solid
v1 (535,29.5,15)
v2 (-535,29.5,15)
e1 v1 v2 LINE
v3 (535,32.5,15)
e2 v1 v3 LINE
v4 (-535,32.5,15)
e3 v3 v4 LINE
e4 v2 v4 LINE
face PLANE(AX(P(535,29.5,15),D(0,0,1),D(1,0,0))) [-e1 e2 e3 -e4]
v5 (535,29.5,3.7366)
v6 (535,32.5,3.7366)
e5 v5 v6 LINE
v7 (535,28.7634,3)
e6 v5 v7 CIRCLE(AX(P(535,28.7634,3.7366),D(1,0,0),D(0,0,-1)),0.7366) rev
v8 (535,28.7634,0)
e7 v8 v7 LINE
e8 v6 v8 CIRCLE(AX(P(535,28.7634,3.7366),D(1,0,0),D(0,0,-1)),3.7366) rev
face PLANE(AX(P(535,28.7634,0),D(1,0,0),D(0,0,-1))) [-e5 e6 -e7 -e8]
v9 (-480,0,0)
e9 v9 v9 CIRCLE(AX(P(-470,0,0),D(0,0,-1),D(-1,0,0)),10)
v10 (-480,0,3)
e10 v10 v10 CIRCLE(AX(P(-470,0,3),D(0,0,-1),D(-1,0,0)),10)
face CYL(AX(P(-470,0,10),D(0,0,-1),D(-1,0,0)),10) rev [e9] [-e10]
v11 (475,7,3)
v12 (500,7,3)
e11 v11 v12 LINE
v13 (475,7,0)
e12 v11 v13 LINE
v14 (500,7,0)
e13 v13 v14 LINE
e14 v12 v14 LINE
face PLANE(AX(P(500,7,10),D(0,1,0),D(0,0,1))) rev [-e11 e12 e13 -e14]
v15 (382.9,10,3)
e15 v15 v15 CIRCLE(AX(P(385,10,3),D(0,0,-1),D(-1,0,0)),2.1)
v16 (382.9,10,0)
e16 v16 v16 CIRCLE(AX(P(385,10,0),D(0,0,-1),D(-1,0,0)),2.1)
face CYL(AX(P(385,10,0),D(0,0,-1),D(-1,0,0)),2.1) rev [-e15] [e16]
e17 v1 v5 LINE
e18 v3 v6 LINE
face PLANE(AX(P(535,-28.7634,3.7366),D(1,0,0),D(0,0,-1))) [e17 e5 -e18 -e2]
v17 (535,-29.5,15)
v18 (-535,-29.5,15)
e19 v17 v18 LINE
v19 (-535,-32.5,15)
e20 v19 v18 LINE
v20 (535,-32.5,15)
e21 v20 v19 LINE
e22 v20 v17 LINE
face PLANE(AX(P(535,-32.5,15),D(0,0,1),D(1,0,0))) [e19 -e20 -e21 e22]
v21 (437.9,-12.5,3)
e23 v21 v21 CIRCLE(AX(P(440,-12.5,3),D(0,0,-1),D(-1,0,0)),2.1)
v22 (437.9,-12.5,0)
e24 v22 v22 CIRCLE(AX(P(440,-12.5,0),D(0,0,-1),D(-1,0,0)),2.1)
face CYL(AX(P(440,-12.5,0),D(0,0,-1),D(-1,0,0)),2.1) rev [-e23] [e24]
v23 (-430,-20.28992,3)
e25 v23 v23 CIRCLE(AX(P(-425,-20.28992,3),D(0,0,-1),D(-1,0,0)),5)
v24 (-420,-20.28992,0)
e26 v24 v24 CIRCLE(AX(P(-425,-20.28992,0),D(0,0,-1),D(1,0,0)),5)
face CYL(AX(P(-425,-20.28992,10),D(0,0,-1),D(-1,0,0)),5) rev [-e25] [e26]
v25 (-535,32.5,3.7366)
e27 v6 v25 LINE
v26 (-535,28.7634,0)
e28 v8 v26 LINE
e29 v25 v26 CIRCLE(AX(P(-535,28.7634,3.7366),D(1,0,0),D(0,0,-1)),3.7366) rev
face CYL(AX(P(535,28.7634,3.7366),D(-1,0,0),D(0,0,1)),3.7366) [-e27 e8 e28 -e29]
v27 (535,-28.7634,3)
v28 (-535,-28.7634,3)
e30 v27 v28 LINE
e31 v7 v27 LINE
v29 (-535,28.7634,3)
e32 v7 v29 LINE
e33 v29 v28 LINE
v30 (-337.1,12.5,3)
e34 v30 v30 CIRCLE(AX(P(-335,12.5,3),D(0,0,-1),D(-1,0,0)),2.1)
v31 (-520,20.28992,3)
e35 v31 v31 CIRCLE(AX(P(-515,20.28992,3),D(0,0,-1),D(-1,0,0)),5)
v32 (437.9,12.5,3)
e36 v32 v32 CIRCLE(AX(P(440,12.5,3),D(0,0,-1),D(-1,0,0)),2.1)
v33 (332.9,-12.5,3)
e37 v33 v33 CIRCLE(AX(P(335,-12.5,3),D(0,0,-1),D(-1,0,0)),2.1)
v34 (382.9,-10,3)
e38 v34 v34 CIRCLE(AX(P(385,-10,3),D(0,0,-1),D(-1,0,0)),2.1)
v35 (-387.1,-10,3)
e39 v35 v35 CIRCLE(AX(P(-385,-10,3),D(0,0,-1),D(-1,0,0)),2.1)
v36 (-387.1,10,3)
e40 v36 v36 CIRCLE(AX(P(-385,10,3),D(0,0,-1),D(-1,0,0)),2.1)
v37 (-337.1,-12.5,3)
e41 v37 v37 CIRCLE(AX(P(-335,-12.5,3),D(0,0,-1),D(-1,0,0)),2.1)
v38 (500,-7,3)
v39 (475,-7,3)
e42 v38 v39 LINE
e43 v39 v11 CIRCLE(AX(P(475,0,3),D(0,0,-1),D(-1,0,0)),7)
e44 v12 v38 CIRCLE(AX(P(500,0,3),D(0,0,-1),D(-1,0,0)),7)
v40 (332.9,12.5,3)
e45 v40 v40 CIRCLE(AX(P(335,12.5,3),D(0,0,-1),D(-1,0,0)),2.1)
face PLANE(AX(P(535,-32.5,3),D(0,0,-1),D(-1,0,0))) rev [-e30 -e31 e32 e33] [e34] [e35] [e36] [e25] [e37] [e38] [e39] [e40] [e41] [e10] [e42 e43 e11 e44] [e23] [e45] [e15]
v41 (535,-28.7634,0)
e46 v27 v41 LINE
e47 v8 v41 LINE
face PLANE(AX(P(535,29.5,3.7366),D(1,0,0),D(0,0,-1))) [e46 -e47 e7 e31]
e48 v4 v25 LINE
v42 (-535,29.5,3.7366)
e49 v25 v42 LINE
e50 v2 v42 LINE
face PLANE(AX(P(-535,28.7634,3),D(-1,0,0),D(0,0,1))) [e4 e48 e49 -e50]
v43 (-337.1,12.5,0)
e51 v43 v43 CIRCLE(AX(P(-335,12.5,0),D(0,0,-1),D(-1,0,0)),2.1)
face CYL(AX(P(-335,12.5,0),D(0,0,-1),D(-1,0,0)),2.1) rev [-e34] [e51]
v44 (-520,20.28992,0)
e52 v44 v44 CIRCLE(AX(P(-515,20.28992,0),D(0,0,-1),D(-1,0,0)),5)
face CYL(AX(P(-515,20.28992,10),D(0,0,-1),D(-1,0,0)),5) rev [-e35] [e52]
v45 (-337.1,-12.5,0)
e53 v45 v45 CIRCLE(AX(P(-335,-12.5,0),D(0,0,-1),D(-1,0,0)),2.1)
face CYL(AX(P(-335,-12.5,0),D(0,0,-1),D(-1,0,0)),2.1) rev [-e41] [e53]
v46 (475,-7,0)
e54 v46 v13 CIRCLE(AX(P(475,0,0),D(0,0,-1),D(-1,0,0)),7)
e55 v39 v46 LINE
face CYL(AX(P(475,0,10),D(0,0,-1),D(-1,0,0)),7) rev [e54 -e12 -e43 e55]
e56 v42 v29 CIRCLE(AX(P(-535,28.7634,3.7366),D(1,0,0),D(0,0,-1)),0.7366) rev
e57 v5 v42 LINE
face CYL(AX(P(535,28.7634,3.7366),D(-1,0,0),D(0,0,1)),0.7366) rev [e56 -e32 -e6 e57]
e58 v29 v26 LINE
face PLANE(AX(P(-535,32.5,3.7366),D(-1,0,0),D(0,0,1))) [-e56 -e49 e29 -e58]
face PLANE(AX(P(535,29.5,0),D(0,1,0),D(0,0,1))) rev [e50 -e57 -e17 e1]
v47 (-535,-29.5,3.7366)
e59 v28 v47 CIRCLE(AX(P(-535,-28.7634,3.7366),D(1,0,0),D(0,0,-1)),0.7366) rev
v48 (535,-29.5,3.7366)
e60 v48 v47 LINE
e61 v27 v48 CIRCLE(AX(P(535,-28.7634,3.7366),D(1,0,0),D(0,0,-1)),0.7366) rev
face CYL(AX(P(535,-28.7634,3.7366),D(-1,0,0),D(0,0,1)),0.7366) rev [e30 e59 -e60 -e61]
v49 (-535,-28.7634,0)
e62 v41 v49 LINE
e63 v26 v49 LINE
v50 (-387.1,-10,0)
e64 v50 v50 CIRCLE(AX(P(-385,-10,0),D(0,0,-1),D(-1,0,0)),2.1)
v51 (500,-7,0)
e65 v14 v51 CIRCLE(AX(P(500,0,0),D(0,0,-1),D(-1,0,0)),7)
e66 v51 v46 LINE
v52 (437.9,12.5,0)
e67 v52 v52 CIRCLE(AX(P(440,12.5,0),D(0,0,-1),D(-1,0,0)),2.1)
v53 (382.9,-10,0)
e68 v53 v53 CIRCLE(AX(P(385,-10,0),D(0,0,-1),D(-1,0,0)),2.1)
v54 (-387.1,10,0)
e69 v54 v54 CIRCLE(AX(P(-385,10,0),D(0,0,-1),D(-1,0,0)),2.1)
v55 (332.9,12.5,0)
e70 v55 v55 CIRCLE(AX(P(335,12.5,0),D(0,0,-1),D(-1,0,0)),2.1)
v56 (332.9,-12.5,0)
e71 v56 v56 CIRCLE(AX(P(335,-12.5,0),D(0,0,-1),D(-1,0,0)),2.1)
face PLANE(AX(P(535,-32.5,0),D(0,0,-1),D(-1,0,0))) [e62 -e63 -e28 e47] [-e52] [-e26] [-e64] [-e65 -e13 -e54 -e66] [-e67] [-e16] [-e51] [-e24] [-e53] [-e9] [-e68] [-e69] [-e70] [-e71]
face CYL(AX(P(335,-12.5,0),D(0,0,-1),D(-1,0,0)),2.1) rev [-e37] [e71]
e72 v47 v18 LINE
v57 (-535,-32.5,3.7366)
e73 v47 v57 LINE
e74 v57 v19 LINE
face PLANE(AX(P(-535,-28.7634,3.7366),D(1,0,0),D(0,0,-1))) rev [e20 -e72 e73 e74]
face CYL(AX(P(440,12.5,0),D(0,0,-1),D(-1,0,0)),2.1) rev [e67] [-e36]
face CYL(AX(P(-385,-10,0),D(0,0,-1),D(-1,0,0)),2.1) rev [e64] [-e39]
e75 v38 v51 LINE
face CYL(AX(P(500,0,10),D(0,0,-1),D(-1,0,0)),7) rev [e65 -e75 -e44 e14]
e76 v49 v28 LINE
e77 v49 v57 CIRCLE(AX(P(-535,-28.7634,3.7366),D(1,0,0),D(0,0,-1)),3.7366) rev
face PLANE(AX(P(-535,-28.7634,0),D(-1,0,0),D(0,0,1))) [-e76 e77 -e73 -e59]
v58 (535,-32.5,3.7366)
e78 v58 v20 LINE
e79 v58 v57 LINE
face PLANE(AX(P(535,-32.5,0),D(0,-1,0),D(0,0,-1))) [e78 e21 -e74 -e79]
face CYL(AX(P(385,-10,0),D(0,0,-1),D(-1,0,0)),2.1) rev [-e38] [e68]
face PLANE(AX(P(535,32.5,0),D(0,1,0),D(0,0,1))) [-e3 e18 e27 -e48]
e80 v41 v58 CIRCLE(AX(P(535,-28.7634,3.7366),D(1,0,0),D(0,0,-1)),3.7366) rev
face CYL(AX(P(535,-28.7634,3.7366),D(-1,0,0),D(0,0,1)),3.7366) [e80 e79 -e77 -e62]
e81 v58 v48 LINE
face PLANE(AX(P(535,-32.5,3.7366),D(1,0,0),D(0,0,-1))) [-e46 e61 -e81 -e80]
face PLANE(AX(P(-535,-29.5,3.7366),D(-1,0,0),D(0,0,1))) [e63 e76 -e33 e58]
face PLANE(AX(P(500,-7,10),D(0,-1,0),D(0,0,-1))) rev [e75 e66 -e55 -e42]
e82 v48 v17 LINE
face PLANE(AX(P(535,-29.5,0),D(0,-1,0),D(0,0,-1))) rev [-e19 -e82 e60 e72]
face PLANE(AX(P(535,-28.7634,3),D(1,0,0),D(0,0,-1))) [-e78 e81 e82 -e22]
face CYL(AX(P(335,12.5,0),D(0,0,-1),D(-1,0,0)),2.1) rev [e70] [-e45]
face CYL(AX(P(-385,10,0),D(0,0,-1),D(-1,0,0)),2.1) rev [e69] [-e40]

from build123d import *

# Parameters (mm, degrees)
TABAN_FLAN_1_DEPTH    = 535
KES_EKSTR_ZYON1_DEPTH = 10
M5_DI_LI_DELIK1_D     = 4.2
M5_DI_LI_DELIK2_D     = 4.2
M5_DI_LI_DELIK3_D     = 4.2
IZIM13_R              = 10
IZIM13_R_2            = 5
KES_EKSTR_ZYON2_DEPTH = 10


# Sheet-metal steps are written as plain solids
with BuildPart() as part:
    # Çizim1 → Taban-Flanş1 (new, symmetric)
    with BuildSketch(Plane(origin=(0, 0, 0), x_dir=(0, 0, -1), z_dir=(1, 0, 0))):
        with BuildLine():
            Line((-15, -32.5), (-3.7366, -32.5))
            ThreePointArc((-3.7366, -32.5), (-1.094424801, -31.405575199), (0, -28.7634))
            Line((0, -28.7634), (0, 28.7634))
            ThreePointArc((0, 28.7634), (-1.094424801, 31.405575199), (-3.7366, 32.5))
            Line((-3.7366, 32.5), (-15, 32.5))
            Line((-15, 32.5), (-15, 29.5))
            Line((-15, 29.5), (-3.7366, 29.5))
            ThreePointArc((-3.7366, 29.5), (-3.215745145, 29.284254855), (-3, 28.7634))
            Line((-3, 28.7634), (-3, -28.7634))
            ThreePointArc((-3, -28.7634), (-3.215745145, -29.284254855), (-3.7366, -29.5))
            Line((-3.7366, -29.5), (-15, -29.5))
            Line((-15, -29.5), (-15, -32.5))
        make_face()
    extrude(amount=TABAN_FLAN_1_DEPTH, both=True)

    # Çizim6 → Kes-Ekstrüzyon1 (cut)
    with BuildSketch(Plane(origin=(0, 0, 0), x_dir=(-1, 0, 0), z_dir=(0, 0, -1))):
        with BuildLine():
            Line((-500, 7), (-475, 7))
            ThreePointArc((-475, 7), (-468, 0), (-475, -7))
            Line((-475, -7), (-500, -7))
            ThreePointArc((-500, -7), (-507, 0), (-500, 7))
        make_face()
    extrude(amount=-KES_EKSTR_ZYON1_DEPTH, mode=Mode.SUBTRACT)

    # M5 Dişli Delik1 (through all)
    with Locations(Plane(origin=(440, 12.5, 0), x_dir=(-1, 0, 0), z_dir=(0, 0, -1))):
        with Locations((0, 0), (0, -25)):
            Hole(M5_DI_LI_DELIK1_D / 2)

    # M5 Dişli Delik2 (through all)
    with Locations(Plane(origin=(385, 10, 0), x_dir=(-1, 0, 0), z_dir=(0, 0, -1))):
        with Locations((0, 0), (0, -20)):
            m5_di_li_delik2 = Hole(M5_DI_LI_DELIK2_D / 2)

    # M5 Dişli Delik3 (through all)
    with Locations(Plane(origin=(335, 12.5, 0), x_dir=(-1, 0, 0), z_dir=(0, 0, -1))):
        with Locations((0, 0), (0, -25)):
            m5_di_li_delik3 = Hole(M5_DI_LI_DELIK3_D / 2)

    # Aynalama1: M5 Dişli Delik2, M5 Dişli Delik3 across plane
    add(m5_di_li_delik2.mirror(Plane(origin=(0, 0, 0), x_dir=(0, 0, 1), z_dir=(1, 0, 0))), mode=Mode.SUBTRACT)
    add(m5_di_li_delik3.mirror(Plane(origin=(0, 0, 0), x_dir=(0, 0, 1), z_dir=(1, 0, 0))), mode=Mode.SUBTRACT)

    # Çizim13 → Kes-Ekstrüzyon2 (cut)
    with BuildSketch(Plane(origin=(0, 0, 0), x_dir=(-1, 0, 0), z_dir=(0, 0, -1))):
        with Locations((470, 0)):
            Circle(IZIM13_R)
        with Locations((515, 20.289920322)):
            Circle(IZIM13_R_2)
        with Locations((425, -20.289920322)):
            Circle(IZIM13_R_2)
    extrude(amount=-KES_EKSTR_ZYON2_DEPTH, mode=Mode.SUBTRACT)


solid = part.part
